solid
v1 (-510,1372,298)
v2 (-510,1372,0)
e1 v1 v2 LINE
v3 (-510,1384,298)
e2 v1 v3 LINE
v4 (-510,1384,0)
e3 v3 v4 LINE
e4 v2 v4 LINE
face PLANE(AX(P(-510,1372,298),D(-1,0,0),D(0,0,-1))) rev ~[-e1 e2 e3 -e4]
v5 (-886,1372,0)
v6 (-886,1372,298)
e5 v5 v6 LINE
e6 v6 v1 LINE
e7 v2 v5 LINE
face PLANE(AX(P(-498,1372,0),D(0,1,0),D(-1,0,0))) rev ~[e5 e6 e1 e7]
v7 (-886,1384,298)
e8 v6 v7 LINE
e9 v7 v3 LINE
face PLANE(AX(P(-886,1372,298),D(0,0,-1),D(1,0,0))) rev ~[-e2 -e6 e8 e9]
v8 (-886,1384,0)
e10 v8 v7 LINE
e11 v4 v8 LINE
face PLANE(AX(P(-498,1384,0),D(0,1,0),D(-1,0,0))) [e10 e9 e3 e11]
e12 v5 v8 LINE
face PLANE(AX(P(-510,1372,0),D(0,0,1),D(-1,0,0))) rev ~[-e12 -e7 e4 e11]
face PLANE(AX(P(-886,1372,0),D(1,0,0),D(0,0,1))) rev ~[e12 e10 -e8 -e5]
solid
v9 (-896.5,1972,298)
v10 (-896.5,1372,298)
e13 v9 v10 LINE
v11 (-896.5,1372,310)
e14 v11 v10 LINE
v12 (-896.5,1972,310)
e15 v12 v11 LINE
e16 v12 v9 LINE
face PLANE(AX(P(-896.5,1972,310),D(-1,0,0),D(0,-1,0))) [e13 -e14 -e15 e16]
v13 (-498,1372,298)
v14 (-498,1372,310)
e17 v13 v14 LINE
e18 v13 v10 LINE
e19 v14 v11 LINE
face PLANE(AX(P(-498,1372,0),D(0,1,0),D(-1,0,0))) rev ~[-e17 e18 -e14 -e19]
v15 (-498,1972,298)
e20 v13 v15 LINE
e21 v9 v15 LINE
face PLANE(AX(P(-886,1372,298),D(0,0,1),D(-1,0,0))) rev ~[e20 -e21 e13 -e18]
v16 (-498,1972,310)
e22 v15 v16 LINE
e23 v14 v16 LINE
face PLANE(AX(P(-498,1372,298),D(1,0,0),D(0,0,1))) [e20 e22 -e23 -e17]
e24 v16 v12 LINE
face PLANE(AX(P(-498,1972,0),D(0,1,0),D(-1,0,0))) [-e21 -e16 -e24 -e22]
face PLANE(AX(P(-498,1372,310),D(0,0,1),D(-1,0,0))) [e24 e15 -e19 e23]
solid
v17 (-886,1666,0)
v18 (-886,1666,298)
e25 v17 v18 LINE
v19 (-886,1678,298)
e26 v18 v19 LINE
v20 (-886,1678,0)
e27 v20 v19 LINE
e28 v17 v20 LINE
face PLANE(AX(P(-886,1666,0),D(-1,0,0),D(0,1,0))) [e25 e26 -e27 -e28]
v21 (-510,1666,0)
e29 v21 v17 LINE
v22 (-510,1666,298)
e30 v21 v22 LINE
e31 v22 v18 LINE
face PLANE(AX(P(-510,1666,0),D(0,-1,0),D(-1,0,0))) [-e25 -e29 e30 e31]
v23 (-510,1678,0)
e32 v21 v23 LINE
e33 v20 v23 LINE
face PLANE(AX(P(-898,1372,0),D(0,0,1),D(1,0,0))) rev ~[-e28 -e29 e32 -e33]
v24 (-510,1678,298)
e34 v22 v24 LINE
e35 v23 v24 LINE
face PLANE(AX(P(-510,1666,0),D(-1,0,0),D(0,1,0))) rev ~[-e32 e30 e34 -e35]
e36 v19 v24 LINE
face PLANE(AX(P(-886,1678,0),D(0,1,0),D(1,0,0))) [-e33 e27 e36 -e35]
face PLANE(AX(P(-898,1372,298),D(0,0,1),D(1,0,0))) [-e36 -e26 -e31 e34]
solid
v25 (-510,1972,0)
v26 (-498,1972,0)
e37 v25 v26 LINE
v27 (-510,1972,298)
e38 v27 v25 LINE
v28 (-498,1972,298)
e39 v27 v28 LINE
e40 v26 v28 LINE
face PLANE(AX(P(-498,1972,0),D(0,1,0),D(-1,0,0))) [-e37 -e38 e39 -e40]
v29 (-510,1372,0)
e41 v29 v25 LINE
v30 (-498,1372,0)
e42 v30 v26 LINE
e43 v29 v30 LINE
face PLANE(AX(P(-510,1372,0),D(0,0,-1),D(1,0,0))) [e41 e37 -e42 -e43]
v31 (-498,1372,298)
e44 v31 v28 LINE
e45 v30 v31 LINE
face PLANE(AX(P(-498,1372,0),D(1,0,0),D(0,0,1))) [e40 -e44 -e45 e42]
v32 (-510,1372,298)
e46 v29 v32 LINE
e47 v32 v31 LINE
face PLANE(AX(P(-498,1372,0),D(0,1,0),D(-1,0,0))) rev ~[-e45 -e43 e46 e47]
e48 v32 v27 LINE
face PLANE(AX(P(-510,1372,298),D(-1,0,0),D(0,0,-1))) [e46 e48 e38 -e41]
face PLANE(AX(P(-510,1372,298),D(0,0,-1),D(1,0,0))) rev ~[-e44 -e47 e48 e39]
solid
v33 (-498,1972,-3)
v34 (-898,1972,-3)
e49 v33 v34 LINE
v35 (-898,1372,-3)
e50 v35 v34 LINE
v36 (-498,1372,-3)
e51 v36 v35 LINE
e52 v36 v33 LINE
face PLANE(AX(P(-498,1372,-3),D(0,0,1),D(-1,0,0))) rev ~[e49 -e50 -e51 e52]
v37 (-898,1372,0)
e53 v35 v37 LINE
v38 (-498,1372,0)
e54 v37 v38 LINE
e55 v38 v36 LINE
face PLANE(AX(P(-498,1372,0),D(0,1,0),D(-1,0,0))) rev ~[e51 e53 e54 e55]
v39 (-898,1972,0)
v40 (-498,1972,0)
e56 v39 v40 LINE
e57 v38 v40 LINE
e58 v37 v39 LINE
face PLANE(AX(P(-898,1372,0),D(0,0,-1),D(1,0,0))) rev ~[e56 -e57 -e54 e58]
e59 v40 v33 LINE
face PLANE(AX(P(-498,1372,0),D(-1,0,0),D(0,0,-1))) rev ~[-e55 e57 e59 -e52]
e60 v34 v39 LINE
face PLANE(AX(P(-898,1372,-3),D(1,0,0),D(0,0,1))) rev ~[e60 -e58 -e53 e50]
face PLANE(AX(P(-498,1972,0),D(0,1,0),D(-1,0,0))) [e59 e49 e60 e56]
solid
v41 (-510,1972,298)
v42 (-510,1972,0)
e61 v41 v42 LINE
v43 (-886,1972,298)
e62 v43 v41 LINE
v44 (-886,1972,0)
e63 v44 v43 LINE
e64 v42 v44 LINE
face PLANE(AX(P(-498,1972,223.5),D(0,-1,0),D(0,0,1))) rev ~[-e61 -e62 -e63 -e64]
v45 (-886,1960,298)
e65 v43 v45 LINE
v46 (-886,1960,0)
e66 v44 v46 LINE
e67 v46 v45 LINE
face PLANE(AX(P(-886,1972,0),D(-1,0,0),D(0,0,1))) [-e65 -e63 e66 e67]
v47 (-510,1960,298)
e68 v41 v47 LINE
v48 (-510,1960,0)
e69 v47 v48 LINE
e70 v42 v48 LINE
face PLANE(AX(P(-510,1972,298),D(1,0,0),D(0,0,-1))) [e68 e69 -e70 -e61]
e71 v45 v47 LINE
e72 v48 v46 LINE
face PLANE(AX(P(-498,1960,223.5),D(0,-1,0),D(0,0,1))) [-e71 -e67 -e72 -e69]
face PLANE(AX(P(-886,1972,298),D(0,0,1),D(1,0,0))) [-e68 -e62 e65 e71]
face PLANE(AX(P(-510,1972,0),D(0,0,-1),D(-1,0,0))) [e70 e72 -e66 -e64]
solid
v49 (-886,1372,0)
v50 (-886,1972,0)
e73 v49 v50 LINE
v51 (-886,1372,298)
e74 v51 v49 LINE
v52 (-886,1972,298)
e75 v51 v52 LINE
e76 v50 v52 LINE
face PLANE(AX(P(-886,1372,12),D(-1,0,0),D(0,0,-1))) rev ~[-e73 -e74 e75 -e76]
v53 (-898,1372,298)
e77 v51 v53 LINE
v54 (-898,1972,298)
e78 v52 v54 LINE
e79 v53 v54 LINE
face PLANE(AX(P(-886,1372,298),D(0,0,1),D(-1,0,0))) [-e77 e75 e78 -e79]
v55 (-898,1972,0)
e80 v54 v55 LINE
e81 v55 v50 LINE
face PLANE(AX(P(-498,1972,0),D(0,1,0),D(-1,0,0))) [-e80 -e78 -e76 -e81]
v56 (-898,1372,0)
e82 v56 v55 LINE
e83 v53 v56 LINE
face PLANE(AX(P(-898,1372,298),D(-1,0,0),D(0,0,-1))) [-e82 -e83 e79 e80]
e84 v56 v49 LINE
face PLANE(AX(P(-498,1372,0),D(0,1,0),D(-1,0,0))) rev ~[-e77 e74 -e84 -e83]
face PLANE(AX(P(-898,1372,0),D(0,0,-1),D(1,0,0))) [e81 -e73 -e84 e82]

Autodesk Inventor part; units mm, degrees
ref_plane "YZ Plane" through (0, 0, 0) normal (1, 0, 0) x (0, 1, 0)
sketch "Sketch1" plane through (0, 0, 0) normal (0, 0, 1) x (1, 0, 0)
  line L0 (-1498, 0) -> (1498, 0) construction
  line L1 (-1498, 0) -> (-898, 0)
  line L2 (-898, 0) -> (-898, 2068)
  line L3 (-898, 2068) -> (-1498, 2068)
  line L4 (-1498, 2068) -> (-1498, 0)
  line L5 (-898, 0) -> (-498, 0)
  line L6 (-498, 0) -> (-498, 816)
  line L7 (-498, 816) -> (-898, 816)
  line L8 (-898, 816) -> (-898, 0)
  line L9 (-498, 0) -> (102, 0)
  line L10 (102, 0) -> (102, 816)
  line L11 (102, 816) -> (-498, 816)
  line L12 (-498, 816) -> (-498, 0)
  line L13 (102, 0) -> (698, 0)
  line L14 (698, 0) -> (698, 668)
  line L15 (698, 668) -> (102, 668)
  line L16 (102, 668) -> (102, 0)
  line L17 (698, 0) -> (1498, 0)
  line L18 (1498, 0) -> (1498, 816)
  line L19 (1498, 816) -> (698, 816)
  line L20 (698, 816) -> (698, 0)
  line L21 (-1498, 0) -> (1498, 0)
  line L22 (1498, 0) -> (1498, 96)
  line L23 (1498, 96) -> (-1498, 96)
  line L24 (-1498, 96) -> (-1498, 0)
  line L25 (-898, 816) -> (1498, 816)
  line L26 (1498, 816) -> (1498, 832)
  line L27 (1498, 832) -> (-898, 832)
  line L28 (-898, 832) -> (-898, 816)
  line L29 (-898, 1972) -> (-498, 1972)
  line L30 (-498, 1972) -> (-498, 1372)
  line L31 (-498, 1372) -> (-898, 1372)
  line L32 (-898, 1372) -> (-898, 1972)
  line L33 (698, 1972) -> (1498, 1972)
  line L34 (1498, 1972) -> (1498, 1372)
  line L35 (1498, 1372) -> (698, 1372)
  line L36 (698, 1372) -> (698, 1972)
  line L37 (698, 1372) -> (98, 1372)
  line L38 (98, 1372) -> (98, 1972)
  line L39 (98, 1972) -> (698, 1972)
  line L40 (698, 1972) -> (698, 1372)
  line L41 (-498, 1372) -> (98, 1372)
  line L42 (-498, 1372) -> (-275, 1637.7611)
  line L43 (98, 1372) -> (-125, 1637.7611)
  line L44 (-275, 1637.7611) -> (-125, 1637.7611)
  line L45 (-125, 1637.7611) -> (-125, 2068)
  line L46 (-125, 2068) -> (-275, 2068)
  line L47 (-275, 2068) -> (-275, 1637.7611)
  line L48 (1098, 816) -> (1098, 96)
  line L49 (-198, 816) -> (-198, 96)
  line L50 (-898, 668) -> (-498, 668)
  line L51 (-1498, 520) -> (-898, 520)
  line L52 (-1498, 1579) -> (-898, 1579)
  line L53 (398, 1972) -> (398, 1372)
  line L54 (1098, 1972) -> (1098, 1372)
  line L55 (698, 1876) -> (1498, 1876)
  line L56 (698, 1468) -> (1498, 1468)
  line L57 (-1498, 1049.5) -> (-898, 1049.5)
  point P0 (0, 0)
  point P1 (0, 0)
  point P2 (0, 0)
  point P3 (-198, 816)
  point P4 (0, 0)
  dimension "d0" = 2996
  dimension "d1" = 600
  dimension "d2" = 2068
  dimension "d3" = 400
  dimension "d4" = 816
  dimension "d5" = 600
  dimension "d6" = 816
  dimension "d7" = 596
  dimension "d8" = 668
  dimension "d9" = 800
  dimension "d10" = 816
  dimension "d11" = 96
  dimension "d12" = 16
  dimension "d13" = 400
  dimension "d14" = 600
  dimension "d15" = 96
  dimension "d16" = 800
  dimension "d17" = 600
  dimension "d18" = 600
  dimension "d19" = 600
  dimension "d20" = 50
  dimension "d21" = 150
  dimension "d22" = 148
  dimension "d23" = 1059
  dimension "d24" = 96
  dimension "d25" = 96
  dimension "d26" = 529.5
ref_plane "Work Plane1" through (-498, 1372, 0) normal (0, 1, 0) x (-1, 0, 0)
sketch "Sketch2" plane through (-498, 1372, 0) normal (0, 1, 0) x (-1, 0, 0)
  line L0 (400, 0) -> (0, 0)
  line L1 (0, 0) -> (0, 310)
  line L2 (0, 310) -> (400, 310)
  line L3 (400, 310) -> (400, 0)
  line L4 (12, 12) -> (388, 12)
  line L5 (388, 12) -> (388, 298)
  line L6 (388, 298) -> (12, 298)
  line L7 (12, 298) -> (12, 12)
  line L8 (388, 12) -> (388, 0)
  line L9 (12, 12) -> (12, 0)
  line L10 (12, 298) -> (0, 298)
  line L11 (388, 298) -> (400, 298)
  point P0 (-498, 0)
  point P1 (0, 0)
  point P2 (0, 0)
  point P3 (0, 0)
  point P4 (400, 0)
  dimension "d28" = 400
  dimension "d29" = 310
  dimension "d30" = 12
extrude "Extrusion1" add sketch "Sketch2" along normal up to surface (600 mm away) contours L0 L8 L5 L11 L3 | L0 L1 L10 L7 L9
extrude "Extrusion2" add sketch "Sketch2" along normal up to surface (600 mm away) separate body contours L11 L6 L10 L1 L2 L3
sketch "Sketch3" plane through (-498, 1372, 0) normal (0, 1, 0) x (-1, 0, 0)
  line L0 (400, 298) -> (400, 0) projected
  line L1 (400, 0) -> (0, 0)
  line L2 (0, 0) -> (0, -3)
  line L3 (0, -3) -> (400, -3)
  line L4 (400, -3) -> (400, 0)
  point P0 (-498, 0)
  dimension "d35" = 3
extrude "Extrusion3" add sketch "Sketch3" along normal up to surface (600 mm away) separate body
sketch "Sketch4" plane through (-498, 1372, 0) normal (0, 1, 0) x (-1, 0, 0)
  line L0 (0, 0) -> (400, 0) projected
  line L1 (388, 0) -> (388, 298) projected
  line L2 (12, 298) -> (12, 0) projected
  line L3 (400, 298) -> (0, 298) projected
  point P0 (-498, 0)
extrude "Extrusion4" add sketch "Sketch4" along normal blind 12 separate body
ref_plane "Work Plane2" through (-498, 1972, 223.5) normal (0, -1, 0) x (0, 0, 1)
sketch "Sketch5" plane through (-498, 1972, 223.5) normal (0, -1, 0) x (0, 0, 1)
  line L0 (-223.5, 388) -> (74.5, 388) projected
  line L1 (74.5, 12) -> (-223.5, 12) projected
  line L2 (74.5, 400) -> (74.5, 0) projected
  line L3 (-223.5, 0) -> (-223.5, 400) projected
  point P0 (-223.5, -498)
extrude "Extrusion5" add sketch "Sketch5" along normal blind 12 separate body
sketch "Sketch6" plane through (-898, 1372, 0) normal (0, 0, 1) x (1, 0, 0)
  line L0 (12, 0) -> (12, 600) projected
  line L1 (388, 0) -> (388, 600) projected
  line L2 (12, 306) -> (388, 306)
  line L3 (388, 306) -> (388, 294)
  line L4 (388, 294) -> (12, 294)
  line L5 (12, 294) -> (12, 306)
  line L6 (12, 12) -> (388, 12) projected
  point P0 (898, -1372)
  point P1 (12, 294)
  point P2 (388, 306)
  dimension "d42" = 282
  dimension "d43" = 12
extrude "Extrusion6" add sketch "Sketch6" along normal up to surface (298 mm away) separate body contours L0 L2 L1 L4
sketch "Sketch7" plane through (-898, 1372, 310) normal (0, 0, 1) x (1, 0, 0)
  line L0 (0, 0) -> (400, 0) projected
  line L1 (0, 600) -> (1.5, 600)
  line L2 (1.5, 600) -> (1.5, 0)
  line L3 (1.5, 0) -> (0, 0)
  line L4 (0, 0) -> (0, 600)
  point P0 (898, -1372)
  dimension "d46" = 1.5
extrude "Extrusion7" cut sketch "Sketch7" against normal blind 12 bodies 2
properties part number "Wall Cabinet 1"
